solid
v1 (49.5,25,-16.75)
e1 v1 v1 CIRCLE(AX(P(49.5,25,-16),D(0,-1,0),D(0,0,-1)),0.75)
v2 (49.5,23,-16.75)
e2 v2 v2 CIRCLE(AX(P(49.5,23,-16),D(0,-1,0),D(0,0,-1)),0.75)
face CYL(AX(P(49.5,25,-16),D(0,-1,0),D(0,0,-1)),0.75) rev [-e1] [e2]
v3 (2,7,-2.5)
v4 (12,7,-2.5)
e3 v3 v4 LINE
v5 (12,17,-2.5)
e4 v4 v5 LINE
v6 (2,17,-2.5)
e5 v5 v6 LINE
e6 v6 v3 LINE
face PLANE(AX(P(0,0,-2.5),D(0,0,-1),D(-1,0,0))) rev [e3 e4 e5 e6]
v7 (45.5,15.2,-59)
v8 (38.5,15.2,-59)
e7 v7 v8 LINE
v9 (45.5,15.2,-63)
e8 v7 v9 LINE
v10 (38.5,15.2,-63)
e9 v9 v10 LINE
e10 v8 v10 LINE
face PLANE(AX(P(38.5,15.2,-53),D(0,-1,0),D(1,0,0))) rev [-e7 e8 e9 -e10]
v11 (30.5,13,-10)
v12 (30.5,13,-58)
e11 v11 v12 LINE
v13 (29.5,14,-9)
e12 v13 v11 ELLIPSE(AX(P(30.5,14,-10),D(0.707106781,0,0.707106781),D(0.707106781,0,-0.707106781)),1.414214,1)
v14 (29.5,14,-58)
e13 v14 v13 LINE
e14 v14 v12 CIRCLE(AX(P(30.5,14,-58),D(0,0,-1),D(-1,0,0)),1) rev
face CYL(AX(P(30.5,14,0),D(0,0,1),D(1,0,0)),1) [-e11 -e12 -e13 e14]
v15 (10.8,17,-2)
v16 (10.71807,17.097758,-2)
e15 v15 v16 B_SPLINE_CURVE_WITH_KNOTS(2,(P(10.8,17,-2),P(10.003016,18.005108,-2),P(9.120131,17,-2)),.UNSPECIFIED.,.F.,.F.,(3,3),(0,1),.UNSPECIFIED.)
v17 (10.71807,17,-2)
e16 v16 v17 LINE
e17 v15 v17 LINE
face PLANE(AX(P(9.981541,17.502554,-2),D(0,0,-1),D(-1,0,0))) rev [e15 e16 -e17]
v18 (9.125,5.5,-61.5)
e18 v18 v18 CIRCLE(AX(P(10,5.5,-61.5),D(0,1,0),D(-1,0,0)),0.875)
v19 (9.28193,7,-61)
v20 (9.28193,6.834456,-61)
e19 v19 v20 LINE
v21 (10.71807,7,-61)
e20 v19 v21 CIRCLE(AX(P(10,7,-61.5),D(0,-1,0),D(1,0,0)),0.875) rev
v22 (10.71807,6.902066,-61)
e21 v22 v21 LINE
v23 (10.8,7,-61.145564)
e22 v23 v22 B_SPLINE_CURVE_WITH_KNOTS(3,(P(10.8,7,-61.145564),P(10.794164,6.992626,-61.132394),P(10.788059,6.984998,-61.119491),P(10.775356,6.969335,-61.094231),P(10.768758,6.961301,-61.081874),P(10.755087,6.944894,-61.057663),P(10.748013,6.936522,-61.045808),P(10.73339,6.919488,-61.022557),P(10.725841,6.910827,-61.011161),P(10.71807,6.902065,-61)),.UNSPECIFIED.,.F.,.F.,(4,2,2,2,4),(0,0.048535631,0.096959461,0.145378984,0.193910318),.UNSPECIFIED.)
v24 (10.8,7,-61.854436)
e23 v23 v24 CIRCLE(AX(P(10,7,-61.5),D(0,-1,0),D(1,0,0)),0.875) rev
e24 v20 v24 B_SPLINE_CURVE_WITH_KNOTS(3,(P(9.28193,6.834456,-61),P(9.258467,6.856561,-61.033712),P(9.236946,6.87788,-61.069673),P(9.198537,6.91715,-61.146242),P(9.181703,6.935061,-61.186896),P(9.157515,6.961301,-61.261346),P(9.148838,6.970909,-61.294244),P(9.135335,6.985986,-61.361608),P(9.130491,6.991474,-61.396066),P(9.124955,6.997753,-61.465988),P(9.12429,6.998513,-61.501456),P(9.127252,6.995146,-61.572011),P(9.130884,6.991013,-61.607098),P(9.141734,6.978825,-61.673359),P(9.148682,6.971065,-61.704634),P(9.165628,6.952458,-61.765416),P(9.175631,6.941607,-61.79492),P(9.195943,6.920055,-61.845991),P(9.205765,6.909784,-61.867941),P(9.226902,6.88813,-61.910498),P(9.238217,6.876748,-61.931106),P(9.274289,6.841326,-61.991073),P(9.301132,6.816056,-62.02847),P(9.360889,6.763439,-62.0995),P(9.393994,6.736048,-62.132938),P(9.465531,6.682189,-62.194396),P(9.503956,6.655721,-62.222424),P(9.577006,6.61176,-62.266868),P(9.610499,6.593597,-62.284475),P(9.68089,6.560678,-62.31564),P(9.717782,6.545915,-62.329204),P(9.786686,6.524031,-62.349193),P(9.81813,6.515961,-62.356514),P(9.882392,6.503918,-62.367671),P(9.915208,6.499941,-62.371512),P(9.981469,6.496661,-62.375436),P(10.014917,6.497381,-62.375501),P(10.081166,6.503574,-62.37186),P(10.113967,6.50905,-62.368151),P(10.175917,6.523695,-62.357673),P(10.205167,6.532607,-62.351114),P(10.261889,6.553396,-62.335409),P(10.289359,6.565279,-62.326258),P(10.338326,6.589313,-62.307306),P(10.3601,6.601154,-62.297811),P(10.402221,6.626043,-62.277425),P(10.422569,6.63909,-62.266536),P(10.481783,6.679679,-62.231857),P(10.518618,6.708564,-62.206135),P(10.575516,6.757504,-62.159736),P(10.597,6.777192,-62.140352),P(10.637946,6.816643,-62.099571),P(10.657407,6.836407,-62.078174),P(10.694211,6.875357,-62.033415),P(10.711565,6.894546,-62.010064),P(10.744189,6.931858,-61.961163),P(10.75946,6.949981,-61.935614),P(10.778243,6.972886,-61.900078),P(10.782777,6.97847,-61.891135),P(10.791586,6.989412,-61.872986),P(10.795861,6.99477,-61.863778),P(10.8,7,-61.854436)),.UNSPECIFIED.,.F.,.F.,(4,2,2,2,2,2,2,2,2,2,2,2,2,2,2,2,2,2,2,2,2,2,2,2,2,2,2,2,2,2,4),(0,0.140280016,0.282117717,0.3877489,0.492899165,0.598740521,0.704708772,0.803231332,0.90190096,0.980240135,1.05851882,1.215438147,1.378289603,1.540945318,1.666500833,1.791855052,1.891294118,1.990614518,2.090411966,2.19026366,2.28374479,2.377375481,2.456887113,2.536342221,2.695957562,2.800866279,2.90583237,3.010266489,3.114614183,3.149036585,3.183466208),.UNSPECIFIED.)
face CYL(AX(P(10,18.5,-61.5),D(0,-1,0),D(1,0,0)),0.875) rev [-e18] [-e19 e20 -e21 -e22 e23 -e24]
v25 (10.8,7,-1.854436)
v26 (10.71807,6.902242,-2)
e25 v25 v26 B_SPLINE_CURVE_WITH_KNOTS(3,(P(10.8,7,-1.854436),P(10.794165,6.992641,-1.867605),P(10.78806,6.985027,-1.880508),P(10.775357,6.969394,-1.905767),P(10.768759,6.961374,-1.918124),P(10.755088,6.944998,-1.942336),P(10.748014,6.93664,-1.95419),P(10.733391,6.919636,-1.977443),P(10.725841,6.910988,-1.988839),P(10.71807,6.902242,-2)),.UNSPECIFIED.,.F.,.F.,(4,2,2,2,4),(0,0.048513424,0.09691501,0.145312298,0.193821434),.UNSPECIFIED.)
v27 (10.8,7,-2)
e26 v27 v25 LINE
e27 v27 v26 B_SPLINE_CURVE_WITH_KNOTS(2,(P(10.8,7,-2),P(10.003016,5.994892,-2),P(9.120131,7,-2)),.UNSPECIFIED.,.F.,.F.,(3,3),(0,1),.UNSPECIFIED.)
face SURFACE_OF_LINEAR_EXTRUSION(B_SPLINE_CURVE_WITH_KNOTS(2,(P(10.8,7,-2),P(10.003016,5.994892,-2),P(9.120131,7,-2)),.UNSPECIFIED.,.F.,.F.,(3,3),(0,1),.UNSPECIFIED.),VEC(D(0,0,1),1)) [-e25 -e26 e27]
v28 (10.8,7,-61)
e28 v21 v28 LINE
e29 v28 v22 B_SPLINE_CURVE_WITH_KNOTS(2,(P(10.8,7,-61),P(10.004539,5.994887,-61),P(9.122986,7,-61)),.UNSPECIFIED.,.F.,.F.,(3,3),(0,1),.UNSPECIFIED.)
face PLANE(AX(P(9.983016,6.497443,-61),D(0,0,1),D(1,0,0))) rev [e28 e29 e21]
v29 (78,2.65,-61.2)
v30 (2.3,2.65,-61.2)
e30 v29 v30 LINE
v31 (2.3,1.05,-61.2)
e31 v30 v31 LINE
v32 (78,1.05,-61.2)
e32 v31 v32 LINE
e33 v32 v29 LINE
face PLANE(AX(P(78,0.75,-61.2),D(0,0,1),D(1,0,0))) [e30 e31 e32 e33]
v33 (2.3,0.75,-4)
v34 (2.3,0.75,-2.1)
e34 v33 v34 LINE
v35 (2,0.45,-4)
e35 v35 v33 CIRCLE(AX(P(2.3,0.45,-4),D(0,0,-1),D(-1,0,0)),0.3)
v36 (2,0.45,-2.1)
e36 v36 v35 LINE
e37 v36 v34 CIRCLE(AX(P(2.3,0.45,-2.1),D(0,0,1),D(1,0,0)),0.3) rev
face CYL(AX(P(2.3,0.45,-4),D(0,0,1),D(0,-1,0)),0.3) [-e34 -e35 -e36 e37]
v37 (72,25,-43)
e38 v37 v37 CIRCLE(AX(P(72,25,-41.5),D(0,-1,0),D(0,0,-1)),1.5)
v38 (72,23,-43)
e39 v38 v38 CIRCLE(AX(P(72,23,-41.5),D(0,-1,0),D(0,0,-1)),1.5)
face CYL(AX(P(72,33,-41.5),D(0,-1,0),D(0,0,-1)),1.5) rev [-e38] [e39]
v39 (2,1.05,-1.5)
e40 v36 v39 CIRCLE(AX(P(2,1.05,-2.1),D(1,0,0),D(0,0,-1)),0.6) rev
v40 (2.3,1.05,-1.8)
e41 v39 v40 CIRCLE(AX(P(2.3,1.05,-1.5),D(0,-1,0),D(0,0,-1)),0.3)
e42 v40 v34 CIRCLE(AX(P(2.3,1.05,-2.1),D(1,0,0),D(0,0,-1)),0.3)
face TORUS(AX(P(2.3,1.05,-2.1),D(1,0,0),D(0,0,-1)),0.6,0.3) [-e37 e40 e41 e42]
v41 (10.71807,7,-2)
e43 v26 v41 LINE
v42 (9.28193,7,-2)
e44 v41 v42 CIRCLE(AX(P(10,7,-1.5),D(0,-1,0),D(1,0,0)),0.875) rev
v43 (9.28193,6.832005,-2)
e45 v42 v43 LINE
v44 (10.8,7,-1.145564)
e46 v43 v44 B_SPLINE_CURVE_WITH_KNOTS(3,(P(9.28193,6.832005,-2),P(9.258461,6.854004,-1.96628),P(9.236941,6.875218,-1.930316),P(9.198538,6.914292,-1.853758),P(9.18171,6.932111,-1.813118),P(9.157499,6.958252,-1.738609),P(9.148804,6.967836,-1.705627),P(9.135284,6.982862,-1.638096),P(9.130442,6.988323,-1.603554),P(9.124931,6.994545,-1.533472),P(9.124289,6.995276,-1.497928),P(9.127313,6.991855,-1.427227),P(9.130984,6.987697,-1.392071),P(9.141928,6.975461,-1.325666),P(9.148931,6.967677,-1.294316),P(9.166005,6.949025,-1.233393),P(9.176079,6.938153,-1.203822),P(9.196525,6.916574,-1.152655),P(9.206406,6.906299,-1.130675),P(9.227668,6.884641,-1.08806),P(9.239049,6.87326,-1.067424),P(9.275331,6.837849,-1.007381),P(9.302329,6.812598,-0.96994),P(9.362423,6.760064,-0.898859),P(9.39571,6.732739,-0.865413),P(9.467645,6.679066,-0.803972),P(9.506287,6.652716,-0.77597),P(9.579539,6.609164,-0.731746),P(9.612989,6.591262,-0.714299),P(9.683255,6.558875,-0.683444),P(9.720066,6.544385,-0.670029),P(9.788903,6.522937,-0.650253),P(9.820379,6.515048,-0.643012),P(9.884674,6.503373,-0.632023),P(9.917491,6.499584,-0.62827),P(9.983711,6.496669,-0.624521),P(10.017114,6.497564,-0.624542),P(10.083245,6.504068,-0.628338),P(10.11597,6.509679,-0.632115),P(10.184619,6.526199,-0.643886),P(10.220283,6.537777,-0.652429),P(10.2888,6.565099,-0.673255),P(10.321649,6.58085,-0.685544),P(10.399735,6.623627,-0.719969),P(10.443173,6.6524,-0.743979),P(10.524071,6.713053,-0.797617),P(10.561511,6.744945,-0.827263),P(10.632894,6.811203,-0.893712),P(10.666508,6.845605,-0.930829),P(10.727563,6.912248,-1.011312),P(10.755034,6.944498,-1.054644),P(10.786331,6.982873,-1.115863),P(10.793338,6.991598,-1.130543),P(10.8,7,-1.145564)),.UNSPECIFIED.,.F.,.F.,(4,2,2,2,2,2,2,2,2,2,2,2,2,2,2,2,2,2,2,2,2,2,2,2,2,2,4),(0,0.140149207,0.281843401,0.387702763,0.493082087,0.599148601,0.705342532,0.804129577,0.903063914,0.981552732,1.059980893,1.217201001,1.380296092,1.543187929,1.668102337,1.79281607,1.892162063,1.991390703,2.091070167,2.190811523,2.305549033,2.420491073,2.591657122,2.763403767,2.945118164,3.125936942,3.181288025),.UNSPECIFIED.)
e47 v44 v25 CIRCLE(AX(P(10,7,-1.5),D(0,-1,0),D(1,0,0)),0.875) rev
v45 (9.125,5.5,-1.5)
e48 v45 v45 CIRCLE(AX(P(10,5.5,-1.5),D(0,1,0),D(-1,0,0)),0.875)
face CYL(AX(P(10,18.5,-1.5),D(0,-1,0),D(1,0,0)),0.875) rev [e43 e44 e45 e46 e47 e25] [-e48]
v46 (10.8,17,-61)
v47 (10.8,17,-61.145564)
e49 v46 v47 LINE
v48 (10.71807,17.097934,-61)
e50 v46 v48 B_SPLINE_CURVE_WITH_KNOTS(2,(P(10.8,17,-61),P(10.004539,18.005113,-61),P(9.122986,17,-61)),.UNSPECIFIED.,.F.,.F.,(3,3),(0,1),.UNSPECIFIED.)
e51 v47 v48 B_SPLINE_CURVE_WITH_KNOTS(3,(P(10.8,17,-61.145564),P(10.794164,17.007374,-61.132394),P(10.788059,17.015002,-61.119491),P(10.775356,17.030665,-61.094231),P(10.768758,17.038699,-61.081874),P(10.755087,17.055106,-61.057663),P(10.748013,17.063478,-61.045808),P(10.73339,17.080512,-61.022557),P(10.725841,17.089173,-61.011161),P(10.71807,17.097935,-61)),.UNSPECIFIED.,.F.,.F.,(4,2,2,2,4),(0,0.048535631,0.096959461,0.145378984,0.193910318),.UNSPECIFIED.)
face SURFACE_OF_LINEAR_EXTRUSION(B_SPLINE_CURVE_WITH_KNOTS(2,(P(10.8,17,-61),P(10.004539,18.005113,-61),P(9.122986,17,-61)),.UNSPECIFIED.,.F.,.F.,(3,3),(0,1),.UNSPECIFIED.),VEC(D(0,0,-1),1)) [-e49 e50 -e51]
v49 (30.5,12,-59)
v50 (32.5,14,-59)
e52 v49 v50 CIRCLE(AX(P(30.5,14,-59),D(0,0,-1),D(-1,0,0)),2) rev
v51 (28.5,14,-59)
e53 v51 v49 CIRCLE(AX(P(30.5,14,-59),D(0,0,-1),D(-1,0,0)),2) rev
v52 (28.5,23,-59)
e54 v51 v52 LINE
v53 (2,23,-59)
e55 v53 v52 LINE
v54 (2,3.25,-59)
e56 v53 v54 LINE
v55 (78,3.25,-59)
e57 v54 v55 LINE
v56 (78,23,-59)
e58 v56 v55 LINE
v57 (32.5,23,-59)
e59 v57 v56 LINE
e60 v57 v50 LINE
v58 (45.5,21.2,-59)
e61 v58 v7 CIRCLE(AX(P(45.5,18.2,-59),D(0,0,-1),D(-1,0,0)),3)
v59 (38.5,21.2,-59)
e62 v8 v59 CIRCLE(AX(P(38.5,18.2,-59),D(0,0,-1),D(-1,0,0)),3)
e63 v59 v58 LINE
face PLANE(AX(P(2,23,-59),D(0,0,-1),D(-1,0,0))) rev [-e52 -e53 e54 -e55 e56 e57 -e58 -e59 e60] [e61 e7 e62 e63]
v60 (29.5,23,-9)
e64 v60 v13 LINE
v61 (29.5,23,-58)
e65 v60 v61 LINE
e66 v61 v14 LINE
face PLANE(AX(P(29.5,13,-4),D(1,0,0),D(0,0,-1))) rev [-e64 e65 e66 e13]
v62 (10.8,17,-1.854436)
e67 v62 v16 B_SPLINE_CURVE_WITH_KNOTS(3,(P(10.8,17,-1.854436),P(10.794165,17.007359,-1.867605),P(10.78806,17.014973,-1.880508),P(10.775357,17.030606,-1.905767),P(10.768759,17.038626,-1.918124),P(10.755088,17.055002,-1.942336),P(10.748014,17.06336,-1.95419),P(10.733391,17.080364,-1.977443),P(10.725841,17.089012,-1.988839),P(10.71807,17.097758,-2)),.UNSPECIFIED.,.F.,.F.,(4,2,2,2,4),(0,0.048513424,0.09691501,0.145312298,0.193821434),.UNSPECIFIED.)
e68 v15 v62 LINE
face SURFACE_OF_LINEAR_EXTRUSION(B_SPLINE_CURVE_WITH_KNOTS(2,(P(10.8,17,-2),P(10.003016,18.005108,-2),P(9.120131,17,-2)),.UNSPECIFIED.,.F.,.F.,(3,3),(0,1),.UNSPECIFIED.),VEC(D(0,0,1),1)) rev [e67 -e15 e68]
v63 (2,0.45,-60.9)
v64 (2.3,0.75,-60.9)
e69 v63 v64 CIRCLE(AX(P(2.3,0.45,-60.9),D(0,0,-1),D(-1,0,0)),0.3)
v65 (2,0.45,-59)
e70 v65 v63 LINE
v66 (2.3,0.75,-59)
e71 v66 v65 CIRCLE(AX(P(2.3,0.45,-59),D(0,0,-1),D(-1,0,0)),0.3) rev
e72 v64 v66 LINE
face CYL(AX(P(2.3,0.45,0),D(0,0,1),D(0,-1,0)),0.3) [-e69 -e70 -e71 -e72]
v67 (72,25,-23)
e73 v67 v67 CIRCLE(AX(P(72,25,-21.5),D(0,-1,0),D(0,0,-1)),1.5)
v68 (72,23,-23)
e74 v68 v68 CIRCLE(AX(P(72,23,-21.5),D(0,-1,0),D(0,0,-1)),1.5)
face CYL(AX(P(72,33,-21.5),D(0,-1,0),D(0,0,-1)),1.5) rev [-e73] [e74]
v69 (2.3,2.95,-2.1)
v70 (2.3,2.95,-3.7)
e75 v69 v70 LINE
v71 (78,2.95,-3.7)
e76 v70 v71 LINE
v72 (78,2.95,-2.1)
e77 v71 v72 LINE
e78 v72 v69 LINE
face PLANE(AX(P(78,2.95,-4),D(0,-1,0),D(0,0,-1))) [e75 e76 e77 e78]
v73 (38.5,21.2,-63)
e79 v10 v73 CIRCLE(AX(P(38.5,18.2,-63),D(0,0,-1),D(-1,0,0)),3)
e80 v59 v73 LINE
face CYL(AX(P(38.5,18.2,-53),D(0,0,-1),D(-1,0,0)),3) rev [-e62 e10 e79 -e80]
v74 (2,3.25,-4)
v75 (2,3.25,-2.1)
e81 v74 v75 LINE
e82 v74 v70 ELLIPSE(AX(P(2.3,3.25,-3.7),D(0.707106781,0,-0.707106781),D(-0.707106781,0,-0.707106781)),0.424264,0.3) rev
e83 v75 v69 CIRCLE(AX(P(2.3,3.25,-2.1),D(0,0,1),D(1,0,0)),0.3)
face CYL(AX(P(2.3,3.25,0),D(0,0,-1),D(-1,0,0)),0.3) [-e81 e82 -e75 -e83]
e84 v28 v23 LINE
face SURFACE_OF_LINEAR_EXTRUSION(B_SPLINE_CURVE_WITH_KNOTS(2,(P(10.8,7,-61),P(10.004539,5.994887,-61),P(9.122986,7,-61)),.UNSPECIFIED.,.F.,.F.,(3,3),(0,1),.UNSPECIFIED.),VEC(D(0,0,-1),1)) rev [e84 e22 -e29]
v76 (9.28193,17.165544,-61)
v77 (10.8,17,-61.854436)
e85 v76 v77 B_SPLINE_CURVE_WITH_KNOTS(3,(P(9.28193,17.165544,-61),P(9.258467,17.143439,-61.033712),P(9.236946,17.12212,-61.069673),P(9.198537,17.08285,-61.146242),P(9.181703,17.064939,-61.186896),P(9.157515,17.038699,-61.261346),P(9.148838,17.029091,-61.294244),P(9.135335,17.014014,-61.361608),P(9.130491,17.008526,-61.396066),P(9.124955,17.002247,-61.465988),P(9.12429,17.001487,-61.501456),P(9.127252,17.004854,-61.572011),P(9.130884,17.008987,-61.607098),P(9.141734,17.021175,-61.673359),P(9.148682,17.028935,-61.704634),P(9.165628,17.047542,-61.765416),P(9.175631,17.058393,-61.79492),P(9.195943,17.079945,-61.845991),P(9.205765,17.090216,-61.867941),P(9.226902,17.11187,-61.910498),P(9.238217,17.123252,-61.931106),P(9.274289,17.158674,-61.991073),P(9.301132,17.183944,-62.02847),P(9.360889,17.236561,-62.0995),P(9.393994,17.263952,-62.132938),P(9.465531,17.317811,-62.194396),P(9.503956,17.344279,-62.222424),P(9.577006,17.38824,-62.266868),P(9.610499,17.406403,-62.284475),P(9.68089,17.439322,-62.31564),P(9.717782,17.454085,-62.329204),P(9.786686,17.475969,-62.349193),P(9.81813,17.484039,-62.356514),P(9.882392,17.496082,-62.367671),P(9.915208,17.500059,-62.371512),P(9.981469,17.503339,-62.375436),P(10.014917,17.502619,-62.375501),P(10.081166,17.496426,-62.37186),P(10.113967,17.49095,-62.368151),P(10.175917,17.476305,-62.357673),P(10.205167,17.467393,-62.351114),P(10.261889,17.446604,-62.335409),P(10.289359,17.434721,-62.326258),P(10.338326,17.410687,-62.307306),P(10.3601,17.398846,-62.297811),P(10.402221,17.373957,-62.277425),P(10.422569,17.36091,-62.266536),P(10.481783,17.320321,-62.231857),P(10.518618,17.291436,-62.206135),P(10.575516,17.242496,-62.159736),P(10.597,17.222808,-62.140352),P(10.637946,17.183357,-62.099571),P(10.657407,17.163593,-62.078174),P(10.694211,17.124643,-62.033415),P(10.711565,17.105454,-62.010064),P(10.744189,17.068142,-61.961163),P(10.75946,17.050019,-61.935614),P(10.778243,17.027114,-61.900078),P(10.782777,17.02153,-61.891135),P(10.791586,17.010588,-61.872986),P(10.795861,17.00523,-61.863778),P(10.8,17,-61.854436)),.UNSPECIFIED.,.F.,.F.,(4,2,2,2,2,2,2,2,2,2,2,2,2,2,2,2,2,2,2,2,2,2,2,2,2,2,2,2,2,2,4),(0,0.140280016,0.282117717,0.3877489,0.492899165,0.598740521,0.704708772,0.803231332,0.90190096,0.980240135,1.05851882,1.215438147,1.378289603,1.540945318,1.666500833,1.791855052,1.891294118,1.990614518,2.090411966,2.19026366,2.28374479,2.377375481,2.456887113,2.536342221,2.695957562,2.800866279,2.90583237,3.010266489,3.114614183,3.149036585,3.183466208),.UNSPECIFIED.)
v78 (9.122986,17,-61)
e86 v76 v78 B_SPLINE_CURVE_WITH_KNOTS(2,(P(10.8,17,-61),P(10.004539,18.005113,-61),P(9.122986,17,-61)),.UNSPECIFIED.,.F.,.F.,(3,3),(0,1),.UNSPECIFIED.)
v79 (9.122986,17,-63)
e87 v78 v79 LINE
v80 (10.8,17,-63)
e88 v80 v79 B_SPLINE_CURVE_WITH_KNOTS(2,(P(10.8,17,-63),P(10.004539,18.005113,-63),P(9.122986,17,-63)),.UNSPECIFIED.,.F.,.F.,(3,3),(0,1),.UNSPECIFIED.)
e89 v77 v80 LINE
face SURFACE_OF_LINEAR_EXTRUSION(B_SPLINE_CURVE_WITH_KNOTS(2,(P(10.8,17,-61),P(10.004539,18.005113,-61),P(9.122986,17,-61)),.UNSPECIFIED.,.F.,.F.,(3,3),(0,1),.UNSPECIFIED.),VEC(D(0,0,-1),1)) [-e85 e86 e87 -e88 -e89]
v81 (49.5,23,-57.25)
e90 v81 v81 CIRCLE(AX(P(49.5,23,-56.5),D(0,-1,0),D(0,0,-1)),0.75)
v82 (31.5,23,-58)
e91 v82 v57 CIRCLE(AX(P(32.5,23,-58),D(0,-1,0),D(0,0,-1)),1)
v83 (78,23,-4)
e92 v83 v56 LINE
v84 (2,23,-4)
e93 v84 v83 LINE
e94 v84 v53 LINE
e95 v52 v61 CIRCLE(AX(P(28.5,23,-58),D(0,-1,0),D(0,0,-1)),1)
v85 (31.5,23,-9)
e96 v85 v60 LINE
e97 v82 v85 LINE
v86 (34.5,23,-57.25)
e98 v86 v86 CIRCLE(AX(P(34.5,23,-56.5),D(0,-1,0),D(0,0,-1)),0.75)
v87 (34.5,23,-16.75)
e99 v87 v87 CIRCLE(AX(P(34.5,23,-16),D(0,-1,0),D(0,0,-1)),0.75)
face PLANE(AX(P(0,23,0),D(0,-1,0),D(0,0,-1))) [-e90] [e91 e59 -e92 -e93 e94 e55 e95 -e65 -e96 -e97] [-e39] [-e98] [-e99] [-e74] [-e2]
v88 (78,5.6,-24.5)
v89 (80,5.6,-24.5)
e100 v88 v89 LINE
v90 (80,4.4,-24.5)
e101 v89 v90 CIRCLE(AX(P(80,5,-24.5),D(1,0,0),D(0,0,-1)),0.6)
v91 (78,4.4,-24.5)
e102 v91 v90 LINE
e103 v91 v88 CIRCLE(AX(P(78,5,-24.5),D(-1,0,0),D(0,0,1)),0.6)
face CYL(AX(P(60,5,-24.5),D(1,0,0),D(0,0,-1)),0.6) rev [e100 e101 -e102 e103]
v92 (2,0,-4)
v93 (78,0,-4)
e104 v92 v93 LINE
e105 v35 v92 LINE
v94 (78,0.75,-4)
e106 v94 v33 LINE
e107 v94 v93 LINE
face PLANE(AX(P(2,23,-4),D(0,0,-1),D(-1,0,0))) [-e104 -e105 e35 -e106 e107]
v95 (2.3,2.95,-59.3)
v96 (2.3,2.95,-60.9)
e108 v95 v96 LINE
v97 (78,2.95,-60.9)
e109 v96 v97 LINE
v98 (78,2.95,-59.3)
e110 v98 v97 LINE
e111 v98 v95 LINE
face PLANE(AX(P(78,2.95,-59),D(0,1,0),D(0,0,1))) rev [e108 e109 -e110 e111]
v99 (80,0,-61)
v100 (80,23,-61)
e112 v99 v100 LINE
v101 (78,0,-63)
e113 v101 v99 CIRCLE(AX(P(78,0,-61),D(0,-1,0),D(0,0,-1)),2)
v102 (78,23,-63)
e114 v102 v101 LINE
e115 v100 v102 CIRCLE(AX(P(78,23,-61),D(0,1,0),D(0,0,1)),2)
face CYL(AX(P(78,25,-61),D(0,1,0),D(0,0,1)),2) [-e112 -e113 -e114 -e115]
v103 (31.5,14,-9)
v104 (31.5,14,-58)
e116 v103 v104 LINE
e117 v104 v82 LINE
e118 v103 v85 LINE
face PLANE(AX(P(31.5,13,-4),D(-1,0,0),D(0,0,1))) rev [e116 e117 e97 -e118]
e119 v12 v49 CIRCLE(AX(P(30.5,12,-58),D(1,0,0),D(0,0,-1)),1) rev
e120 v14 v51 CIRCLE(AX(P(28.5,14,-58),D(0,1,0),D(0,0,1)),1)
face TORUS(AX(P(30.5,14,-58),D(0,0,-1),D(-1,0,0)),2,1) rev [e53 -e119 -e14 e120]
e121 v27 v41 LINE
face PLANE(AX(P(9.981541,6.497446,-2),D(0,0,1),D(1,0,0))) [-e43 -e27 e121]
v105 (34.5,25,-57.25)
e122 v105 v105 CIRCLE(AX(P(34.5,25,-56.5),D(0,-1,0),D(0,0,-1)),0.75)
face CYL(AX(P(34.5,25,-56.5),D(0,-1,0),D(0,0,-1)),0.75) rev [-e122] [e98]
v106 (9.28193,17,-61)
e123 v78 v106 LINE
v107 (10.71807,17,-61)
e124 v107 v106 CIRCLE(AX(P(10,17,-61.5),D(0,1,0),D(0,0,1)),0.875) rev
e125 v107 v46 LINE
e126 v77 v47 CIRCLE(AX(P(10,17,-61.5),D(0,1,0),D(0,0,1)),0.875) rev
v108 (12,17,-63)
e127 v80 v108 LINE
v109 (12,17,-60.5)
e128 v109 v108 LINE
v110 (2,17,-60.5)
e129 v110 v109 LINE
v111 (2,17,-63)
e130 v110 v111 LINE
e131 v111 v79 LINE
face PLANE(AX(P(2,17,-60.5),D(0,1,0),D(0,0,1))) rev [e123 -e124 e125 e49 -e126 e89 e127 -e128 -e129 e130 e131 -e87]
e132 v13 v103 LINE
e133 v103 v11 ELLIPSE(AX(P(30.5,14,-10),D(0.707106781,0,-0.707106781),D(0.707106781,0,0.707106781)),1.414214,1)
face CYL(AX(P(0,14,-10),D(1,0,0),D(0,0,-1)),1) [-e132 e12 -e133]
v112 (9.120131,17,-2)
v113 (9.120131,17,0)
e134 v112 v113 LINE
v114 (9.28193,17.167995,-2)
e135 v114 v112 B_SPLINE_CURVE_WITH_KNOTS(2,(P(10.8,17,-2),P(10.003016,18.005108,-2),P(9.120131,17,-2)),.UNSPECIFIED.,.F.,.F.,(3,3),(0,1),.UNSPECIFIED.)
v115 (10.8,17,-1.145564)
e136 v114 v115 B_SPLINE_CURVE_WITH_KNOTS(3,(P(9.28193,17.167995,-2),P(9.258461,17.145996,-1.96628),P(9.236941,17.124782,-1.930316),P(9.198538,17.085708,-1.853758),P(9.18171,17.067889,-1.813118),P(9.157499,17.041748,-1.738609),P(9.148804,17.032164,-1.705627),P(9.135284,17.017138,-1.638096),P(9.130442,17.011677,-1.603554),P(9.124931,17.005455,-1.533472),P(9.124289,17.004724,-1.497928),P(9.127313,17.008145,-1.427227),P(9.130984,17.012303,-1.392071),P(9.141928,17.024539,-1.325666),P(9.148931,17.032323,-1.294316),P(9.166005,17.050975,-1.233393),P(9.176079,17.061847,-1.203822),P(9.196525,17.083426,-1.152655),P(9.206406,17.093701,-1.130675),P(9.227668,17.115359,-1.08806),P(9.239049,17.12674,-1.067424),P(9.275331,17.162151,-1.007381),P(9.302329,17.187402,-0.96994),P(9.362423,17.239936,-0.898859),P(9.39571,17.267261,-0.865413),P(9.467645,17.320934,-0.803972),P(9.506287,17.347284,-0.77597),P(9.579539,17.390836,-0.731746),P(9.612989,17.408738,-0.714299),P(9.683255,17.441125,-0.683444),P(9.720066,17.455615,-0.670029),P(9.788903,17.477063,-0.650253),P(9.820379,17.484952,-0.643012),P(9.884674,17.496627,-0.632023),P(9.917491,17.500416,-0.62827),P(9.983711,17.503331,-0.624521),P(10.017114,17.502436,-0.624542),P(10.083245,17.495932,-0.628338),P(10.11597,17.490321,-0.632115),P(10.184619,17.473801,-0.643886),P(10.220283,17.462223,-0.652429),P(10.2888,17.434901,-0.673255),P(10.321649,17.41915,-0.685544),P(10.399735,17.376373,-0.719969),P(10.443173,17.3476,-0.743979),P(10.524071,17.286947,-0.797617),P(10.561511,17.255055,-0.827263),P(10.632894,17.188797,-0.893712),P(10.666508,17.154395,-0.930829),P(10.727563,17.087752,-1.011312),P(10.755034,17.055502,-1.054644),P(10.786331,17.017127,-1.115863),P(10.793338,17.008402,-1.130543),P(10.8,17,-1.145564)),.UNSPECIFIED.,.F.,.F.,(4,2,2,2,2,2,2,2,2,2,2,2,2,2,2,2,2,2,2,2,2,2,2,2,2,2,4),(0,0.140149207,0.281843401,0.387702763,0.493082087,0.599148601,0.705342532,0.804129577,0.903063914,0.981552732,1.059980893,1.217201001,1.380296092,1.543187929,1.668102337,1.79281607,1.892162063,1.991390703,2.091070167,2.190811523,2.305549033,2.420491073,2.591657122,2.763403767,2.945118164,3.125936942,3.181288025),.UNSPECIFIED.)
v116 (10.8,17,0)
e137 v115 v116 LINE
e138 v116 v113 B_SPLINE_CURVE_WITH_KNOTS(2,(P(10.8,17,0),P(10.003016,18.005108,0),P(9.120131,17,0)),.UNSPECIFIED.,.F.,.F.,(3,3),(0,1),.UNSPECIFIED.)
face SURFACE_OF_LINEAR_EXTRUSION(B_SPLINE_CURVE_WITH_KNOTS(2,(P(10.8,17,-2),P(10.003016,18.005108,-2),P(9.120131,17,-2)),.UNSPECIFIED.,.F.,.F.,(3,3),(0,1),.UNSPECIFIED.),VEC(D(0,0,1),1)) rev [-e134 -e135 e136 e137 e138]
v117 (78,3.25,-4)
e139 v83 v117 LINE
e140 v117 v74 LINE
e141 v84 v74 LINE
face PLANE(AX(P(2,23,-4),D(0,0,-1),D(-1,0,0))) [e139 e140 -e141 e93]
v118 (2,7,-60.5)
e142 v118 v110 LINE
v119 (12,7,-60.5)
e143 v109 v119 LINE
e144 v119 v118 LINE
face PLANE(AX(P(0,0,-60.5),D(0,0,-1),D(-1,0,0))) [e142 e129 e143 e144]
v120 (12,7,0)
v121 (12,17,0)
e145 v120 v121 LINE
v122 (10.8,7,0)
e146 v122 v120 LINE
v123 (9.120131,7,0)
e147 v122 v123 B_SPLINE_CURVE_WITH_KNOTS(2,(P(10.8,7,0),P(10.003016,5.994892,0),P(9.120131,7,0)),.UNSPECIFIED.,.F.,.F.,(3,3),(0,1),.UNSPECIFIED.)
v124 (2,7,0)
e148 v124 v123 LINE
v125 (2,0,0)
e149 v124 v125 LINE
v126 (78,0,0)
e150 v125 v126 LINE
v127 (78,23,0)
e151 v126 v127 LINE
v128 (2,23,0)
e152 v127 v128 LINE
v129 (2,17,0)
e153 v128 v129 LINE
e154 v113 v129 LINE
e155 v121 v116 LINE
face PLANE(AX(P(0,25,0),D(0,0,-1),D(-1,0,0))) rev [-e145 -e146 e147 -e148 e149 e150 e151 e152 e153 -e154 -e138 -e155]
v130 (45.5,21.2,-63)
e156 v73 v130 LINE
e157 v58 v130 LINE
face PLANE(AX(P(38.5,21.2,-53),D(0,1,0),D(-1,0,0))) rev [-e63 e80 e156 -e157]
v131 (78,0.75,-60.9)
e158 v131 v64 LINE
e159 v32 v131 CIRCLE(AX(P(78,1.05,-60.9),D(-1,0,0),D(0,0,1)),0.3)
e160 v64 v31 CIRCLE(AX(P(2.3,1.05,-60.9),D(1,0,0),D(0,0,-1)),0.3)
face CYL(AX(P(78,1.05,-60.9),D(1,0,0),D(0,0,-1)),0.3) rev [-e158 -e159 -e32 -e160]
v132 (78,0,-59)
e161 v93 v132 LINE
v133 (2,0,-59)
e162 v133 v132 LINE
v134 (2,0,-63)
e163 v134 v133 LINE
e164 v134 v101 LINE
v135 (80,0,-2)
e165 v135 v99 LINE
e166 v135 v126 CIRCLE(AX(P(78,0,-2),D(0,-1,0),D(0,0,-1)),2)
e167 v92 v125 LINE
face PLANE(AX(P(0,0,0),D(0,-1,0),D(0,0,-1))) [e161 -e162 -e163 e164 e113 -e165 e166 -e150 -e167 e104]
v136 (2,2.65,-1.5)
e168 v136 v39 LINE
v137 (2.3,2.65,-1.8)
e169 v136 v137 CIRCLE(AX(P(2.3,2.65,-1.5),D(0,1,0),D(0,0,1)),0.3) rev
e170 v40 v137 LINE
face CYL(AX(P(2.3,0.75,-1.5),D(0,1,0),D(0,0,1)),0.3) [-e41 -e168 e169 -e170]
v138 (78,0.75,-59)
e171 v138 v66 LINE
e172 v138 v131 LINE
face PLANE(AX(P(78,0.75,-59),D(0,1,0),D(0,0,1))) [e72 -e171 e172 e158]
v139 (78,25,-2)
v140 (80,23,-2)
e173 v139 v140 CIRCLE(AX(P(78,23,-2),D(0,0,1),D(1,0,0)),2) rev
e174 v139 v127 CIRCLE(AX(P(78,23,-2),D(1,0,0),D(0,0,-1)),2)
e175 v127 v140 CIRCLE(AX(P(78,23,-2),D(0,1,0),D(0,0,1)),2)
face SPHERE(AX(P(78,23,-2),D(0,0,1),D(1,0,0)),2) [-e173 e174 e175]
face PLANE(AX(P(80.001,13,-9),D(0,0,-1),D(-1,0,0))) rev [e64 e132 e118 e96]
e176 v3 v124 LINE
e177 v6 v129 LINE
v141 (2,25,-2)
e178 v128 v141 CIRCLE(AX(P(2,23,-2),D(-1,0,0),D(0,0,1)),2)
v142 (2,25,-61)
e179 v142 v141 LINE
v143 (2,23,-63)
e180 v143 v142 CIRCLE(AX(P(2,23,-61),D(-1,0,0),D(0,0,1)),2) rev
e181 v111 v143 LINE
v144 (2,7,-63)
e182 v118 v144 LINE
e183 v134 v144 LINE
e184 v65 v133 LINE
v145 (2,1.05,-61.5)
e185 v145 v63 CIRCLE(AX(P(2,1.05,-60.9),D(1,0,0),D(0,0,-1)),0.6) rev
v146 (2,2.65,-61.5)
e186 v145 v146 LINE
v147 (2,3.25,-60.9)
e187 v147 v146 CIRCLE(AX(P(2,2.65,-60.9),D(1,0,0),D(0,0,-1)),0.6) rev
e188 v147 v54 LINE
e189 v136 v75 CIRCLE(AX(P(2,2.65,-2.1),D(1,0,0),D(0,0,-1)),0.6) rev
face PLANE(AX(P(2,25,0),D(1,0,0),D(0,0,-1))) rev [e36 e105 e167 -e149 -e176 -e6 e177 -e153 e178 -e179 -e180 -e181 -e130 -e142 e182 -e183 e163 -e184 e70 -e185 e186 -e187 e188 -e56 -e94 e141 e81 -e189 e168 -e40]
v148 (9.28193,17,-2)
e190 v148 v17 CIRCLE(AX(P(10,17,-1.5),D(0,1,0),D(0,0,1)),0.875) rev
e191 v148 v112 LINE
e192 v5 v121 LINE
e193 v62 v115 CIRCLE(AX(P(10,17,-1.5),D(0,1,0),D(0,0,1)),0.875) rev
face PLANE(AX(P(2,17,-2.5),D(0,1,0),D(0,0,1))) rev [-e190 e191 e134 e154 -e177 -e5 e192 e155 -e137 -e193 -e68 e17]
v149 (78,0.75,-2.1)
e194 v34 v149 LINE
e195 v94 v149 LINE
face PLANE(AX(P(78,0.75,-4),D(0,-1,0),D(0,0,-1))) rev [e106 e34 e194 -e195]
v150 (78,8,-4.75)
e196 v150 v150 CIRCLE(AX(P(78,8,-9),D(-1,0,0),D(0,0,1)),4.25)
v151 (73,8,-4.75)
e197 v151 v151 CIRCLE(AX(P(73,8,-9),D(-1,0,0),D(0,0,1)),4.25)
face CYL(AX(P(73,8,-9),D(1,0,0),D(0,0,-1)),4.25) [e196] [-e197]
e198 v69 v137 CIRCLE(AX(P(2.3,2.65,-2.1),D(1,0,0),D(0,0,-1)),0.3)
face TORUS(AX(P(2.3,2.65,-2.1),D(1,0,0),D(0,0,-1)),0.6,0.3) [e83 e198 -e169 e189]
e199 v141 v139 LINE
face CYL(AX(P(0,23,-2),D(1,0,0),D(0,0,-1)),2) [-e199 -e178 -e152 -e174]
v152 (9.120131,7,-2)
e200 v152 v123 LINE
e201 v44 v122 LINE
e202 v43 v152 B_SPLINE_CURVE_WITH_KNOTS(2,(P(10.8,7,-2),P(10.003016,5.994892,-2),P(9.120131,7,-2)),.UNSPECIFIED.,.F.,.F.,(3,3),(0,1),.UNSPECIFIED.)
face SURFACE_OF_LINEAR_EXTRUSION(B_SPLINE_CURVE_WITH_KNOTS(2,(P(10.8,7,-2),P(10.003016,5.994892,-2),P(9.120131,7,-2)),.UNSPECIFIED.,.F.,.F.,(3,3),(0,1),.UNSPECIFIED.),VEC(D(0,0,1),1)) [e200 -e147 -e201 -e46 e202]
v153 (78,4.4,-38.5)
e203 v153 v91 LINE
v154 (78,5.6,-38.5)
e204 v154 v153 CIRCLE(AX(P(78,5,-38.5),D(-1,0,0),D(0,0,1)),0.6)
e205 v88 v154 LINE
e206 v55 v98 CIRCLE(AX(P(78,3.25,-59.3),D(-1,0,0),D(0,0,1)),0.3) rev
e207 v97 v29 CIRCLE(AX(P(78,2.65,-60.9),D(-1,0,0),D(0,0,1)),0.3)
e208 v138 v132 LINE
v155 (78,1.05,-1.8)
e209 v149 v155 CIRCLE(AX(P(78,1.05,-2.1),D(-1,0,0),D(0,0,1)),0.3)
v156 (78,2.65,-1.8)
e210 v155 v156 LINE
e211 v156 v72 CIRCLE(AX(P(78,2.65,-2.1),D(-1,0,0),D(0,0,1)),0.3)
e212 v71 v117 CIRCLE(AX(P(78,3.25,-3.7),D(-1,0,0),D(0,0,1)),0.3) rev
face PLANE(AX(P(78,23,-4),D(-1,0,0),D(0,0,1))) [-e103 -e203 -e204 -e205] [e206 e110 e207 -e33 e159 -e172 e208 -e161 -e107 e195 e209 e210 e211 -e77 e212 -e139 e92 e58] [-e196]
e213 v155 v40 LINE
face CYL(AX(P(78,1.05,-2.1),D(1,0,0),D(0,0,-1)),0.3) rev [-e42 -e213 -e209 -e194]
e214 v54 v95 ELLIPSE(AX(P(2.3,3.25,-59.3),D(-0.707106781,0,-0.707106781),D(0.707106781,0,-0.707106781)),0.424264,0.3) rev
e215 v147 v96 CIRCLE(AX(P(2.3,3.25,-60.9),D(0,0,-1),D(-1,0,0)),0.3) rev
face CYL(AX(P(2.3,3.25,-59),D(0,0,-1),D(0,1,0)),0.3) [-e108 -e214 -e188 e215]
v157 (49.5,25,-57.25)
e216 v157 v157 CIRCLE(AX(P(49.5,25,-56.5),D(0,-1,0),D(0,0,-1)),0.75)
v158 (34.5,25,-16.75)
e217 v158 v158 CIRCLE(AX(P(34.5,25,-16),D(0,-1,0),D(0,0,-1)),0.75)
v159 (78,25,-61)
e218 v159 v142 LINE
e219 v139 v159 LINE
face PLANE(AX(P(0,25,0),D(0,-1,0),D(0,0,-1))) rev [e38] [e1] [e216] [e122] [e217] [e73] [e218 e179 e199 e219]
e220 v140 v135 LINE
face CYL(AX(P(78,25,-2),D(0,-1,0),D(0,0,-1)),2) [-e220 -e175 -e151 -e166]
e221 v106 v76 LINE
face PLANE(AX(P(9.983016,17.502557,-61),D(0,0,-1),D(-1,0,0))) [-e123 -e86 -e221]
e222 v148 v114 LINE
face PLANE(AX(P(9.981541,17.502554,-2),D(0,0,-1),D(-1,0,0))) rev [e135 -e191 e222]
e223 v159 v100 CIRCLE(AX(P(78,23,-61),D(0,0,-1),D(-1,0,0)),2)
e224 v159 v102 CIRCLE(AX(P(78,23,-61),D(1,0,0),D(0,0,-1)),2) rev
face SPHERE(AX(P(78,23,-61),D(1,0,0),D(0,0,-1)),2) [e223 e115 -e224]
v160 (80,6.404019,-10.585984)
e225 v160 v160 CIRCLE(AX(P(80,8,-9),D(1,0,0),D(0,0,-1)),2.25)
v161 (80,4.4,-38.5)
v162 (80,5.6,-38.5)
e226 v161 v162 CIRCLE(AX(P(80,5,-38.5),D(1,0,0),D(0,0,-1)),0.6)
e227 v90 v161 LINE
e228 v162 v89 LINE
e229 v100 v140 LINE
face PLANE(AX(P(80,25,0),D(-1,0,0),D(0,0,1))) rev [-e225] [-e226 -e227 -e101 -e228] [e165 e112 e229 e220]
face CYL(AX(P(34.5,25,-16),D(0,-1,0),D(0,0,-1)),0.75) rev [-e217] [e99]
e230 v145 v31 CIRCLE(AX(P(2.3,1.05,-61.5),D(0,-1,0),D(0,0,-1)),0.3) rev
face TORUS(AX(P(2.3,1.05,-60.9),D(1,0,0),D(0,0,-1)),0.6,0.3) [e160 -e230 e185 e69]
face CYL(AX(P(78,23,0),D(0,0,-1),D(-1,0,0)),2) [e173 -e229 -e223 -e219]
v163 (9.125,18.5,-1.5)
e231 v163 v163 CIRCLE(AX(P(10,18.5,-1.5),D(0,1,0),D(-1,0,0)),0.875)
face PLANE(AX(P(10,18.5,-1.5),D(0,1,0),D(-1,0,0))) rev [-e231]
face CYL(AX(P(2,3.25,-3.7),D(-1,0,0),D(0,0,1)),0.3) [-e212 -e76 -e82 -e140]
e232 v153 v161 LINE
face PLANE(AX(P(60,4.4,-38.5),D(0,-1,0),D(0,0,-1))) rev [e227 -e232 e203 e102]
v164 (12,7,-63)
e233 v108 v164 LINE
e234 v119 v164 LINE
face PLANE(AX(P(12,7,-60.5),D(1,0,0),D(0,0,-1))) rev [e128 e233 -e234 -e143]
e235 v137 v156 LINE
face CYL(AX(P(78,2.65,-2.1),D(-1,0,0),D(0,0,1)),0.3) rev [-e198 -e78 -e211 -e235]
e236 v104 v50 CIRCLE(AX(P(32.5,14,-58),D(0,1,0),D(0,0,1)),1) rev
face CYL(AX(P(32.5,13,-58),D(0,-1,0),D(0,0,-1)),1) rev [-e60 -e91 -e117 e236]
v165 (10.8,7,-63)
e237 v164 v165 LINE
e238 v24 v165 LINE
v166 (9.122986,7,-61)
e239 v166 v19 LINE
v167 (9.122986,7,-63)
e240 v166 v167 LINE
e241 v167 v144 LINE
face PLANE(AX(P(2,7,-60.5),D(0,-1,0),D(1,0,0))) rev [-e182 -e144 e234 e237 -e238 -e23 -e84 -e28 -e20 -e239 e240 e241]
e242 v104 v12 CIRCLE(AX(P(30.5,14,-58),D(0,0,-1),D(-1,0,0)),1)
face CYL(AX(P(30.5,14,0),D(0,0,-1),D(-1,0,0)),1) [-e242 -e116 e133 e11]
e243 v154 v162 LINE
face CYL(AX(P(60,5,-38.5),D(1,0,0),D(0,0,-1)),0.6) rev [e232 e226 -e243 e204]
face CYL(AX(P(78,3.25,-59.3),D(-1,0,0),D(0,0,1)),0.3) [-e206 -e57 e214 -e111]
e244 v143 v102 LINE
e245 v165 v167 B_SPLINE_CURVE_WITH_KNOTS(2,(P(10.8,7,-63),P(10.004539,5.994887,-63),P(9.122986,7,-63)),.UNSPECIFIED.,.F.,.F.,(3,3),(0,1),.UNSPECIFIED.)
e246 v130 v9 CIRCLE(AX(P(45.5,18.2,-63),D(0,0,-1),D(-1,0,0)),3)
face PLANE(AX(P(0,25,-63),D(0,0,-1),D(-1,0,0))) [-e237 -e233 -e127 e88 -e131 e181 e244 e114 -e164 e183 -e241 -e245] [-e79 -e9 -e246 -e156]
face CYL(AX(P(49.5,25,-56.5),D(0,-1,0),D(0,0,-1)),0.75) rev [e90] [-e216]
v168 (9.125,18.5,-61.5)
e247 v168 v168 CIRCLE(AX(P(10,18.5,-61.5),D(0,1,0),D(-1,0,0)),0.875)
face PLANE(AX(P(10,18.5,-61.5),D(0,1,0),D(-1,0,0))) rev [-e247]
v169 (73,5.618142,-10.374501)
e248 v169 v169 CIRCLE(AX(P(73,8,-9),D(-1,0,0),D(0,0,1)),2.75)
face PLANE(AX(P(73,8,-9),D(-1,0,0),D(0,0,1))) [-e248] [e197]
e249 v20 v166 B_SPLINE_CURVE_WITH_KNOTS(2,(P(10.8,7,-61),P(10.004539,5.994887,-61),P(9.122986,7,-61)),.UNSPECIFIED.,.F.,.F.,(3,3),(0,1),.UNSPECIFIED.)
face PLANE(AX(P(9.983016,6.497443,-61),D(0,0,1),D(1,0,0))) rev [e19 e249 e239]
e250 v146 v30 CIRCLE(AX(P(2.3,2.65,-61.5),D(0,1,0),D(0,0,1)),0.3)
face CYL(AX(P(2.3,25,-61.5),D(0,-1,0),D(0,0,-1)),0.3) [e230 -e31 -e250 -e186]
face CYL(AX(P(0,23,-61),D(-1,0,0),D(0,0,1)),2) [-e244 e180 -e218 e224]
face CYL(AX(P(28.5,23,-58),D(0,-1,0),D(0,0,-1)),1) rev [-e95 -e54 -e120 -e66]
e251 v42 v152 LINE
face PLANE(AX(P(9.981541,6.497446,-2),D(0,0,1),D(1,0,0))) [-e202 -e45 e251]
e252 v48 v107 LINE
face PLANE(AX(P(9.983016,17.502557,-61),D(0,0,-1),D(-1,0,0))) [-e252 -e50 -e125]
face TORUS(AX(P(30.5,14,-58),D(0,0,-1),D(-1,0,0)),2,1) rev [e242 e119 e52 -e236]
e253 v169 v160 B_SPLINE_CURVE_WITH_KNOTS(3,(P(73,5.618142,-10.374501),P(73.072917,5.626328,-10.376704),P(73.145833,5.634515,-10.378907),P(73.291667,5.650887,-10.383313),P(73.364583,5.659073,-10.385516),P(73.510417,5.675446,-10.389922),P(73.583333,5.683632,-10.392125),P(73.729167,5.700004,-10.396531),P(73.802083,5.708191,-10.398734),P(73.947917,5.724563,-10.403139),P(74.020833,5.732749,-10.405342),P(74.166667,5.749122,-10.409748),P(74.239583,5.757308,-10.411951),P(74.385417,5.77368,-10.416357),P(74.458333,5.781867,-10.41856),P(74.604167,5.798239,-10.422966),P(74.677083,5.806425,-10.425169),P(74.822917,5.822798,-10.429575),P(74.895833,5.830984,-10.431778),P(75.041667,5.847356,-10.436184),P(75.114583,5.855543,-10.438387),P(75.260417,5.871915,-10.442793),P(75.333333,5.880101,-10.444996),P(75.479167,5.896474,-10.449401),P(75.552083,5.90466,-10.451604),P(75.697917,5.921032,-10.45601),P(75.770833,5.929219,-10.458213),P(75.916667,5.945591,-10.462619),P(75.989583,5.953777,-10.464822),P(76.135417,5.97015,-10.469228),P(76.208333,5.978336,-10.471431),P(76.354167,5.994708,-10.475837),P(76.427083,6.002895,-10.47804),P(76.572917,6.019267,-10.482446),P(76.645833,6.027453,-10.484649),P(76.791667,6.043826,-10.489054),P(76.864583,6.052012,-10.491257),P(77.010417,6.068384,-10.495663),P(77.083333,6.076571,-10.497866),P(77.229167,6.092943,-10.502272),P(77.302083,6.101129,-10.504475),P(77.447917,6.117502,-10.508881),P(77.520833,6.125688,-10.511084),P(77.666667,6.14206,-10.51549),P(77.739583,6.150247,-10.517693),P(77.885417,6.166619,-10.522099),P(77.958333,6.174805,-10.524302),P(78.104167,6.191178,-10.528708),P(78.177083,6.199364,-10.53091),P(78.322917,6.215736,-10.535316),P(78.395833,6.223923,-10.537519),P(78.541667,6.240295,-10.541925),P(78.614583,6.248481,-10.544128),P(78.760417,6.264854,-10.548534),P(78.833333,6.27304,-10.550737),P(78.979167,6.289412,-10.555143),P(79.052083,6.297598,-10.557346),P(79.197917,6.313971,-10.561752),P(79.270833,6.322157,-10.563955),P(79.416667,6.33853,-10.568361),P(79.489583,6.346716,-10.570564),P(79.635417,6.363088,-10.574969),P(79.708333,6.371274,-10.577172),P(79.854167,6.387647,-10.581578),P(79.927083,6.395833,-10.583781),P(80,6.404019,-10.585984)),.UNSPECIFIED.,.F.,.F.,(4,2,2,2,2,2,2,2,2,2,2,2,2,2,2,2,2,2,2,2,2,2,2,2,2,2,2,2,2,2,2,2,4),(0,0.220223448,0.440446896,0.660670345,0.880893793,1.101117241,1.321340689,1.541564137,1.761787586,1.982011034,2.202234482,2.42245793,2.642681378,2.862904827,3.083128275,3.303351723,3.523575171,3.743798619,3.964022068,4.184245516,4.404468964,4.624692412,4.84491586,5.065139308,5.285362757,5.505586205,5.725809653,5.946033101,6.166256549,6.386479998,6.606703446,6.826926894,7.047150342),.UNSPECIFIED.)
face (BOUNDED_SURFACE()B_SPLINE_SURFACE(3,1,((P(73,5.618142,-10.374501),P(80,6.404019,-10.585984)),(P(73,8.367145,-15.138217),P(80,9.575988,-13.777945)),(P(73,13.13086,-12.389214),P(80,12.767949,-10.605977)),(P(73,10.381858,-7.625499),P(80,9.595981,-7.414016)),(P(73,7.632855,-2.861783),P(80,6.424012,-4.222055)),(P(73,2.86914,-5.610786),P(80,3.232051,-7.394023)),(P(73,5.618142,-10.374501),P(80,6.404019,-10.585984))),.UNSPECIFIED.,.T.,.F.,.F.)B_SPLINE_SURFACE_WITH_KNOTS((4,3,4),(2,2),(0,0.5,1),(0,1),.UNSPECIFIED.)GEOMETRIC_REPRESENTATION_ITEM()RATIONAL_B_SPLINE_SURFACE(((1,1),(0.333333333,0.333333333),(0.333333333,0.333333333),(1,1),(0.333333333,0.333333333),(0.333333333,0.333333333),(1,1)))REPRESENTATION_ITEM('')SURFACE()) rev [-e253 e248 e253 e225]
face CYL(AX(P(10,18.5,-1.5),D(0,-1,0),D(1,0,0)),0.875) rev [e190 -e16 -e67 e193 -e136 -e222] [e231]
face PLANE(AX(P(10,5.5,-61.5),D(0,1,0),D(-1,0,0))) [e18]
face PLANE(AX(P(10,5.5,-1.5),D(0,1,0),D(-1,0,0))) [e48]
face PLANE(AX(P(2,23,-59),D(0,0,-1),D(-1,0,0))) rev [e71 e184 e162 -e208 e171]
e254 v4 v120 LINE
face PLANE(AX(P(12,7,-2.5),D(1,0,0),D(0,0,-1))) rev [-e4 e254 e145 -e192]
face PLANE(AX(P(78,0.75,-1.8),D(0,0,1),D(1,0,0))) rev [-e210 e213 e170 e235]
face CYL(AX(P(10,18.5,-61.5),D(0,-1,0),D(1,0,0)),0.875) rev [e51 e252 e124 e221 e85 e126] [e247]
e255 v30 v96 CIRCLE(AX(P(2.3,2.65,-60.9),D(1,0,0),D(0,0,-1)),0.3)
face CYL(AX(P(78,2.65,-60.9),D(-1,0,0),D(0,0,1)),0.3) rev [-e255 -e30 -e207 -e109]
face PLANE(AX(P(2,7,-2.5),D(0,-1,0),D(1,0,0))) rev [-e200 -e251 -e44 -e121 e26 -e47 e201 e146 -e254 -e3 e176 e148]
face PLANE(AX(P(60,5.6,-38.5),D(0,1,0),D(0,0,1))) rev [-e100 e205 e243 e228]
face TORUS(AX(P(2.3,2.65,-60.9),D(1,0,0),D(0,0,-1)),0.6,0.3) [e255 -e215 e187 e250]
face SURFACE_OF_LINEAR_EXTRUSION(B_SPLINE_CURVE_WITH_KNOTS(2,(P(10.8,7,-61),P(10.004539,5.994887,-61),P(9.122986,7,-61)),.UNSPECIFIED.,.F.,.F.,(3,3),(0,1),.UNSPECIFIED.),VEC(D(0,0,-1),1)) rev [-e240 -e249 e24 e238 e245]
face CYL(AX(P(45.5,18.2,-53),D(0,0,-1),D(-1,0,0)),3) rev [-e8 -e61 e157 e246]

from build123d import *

# Parameters (mm, degrees)
SKETCH1_W               = 80
SKETCH1_H               = 63
BOSS_EXTRUDE2_DEPTH     = 25
SKETCH1_4_W             = 76
SKETCH1_4_H             = 55
CUT_EXTRUDE1_DEPTH      = 23
CUT_EXTRUDE2_DEPTH      = 20
SKETCH4_W               = 2
SKETCH4_H               = 55
BOSS_EXTRUDE3_DEPTH     = 10
FILLET1_R               = 2
SKETCH5_W               = 2
SKETCH5_H               = 63
CUT_EXTRUDE3_DEPTH      = 105.852277038
SKETCH6_W               = 2.2
SKETCH6_H               = 2.2
CUT_EXTRUDE4_DEPTH      = 76
SKETCH7_W               = 10
SKETCH7_H               = 10
CUT_EXTRUDE5_DEPTH      = 2.5
CUT_EXTRUDE6_DEPTH      = 11.5
CUT_EXTRUDE6_DEPTH_BACK = 1.5
SKETCH8_R               = 0.875
SKETCH9_W               = 10
SKETCH9_H               = 10
CUT_EXTRUDE7_DEPTH      = 2.5
CUT_EXTRUDE8_DEPTH      = 11.5
CUT_EXTRUDE8_DEPTH_BACK = 1.5
SKETCH10_R              = 0.875
CUT_EXTRUDE9_DEPTH      = 2
CUT_EXTRUDE10_DEPTH     = 2
SKETCH13_R              = 0.75
CUT_EXTRUDE11_DEPTH     = 105.393486469
FILLET2_R               = 0.3
CUT_EXTRUDE13_REACH     = 86.524
SKETCH15_W              = 5
SKETCH15_H              = 10
FILLET3_R               = 1
SKETCH16_R              = 4.25
BOSS_EXTRUDE4_DEPTH     = 5
CUT_EXTRUDE14_DEPTH     = 10
SKETCH21_R              = 1.5
CUT_EXTRUDE15_DEPTH     = 10


with BuildPart() as part:
    # Sketch1 → Boss-Extrude2 (new body)
    with BuildSketch(Plane(origin=(0, 0, 0), x_dir=(1, 0, 0), z_dir=(0, 1, 0))):
        with Locations((40, 31.5)):
            Rectangle(SKETCH1_W, SKETCH1_H)
    extrude(amount=BOSS_EXTRUDE2_DEPTH)

    # Sketch1<4> → Cut-Extrude1 (cut)
    with BuildSketch(Plane(origin=(0, 0, 0), x_dir=(1, 0, 0), z_dir=(0, 1, 0))):
        with Locations((40, 31.5)):
            Rectangle(SKETCH1_4_W, SKETCH1_4_H)
    extrude(amount=CUT_EXTRUDE1_DEPTH, mode=Mode.SUBTRACT)

    # Sketch3 → Cut-Extrude2 (cut)
    with BuildSketch(Plane(origin=(80, 0, 0), x_dir=(0, 0, -1), z_dir=(1, 0, 0))):
        with BuildLine():
            Line((38.5, 4.4), (24.5, 4.4))
            ThreePointArc((24.5, 4.4), (23.9, 5), (24.5, 5.6))
            Line((24.5, 5.6), (38.5, 5.6))
            ThreePointArc((38.5, 5.6), (39.1, 5), (38.5, 4.4))
        make_face()
    extrude(amount=-CUT_EXTRUDE2_DEPTH, mode=Mode.SUBTRACT)

    # Sketch4 → Boss-Extrude3 (add)
    with BuildSketch(Plane.XZ.offset(-23)):
        with Locations((30.5, -31.5)):
            Rectangle(SKETCH4_W, SKETCH4_H)
    extrude(amount=BOSS_EXTRUDE3_DEPTH)

    # Fillet1
    fillet1_edges = [part.edges().sort_by_distance(p)[0] for p in [
        (80, 25, -31.5),
        (40, 25, 0),
        (0, 25, -31.5),
        (0, 12.5, 0),
        (80, 12.5, 0),
        (80, 12.5, -63),
        (0, 12.5, -63),
        (40, 25, -63),
    ]]
    fillet(fillet1_edges, radius=FILLET1_R)

    # Sketch5 → Cut-Extrude3 (cut, through all)
    with BuildSketch(Plane(origin=(0, 0, 0), x_dir=(-1, 0, 0), z_dir=(0, -1, 0))):
        with Locations((-1, 31.5)):
            Rectangle(SKETCH5_W, SKETCH5_H)
    extrude(amount=-CUT_EXTRUDE3_DEPTH, mode=Mode.SUBTRACT)

    # Sketch6 → Cut-Extrude4 (cut)
    with BuildSketch(Plane.ZY.offset(-2)):
        with Locations((-2.9, 1.85)):
            Rectangle(SKETCH6_W, SKETCH6_H)
        with Locations((-60.1, 1.85)):
            Rectangle(SKETCH6_W, SKETCH6_H)
    extrude(amount=-CUT_EXTRUDE4_DEPTH, mode=Mode.SUBTRACT)

    # Sketch7 → Cut-Extrude5 (cut)
    with BuildSketch(Plane(origin=(0, 0, -63), x_dir=(-1, 0, 0), z_dir=(0, 0, -1))):
        with Locations((-7, 12)):
            Rectangle(SKETCH7_W, SKETCH7_H)
    extrude(amount=-CUT_EXTRUDE5_DEPTH, mode=Mode.SUBTRACT)

    # Sketch8 → Cut-Extrude6 (cut, two sides: drawn at the far end of the back side and taken through both)
    with BuildSketch(Plane(origin=(0, 7, 0), x_dir=(1, 0, 0), z_dir=(0, 1, 0)).offset(-CUT_EXTRUDE6_DEPTH_BACK)):
        with Locations(Location((10, 61.5, 0), (0, 0, 270))):
            Circle(SKETCH8_R)
    extrude(amount=CUT_EXTRUDE6_DEPTH + CUT_EXTRUDE6_DEPTH_BACK, mode=Mode.SUBTRACT)

    # Sketch9 → Cut-Extrude7 (cut)
    with BuildSketch(Plane.XY):
        with Locations((7, 12)):
            Rectangle(SKETCH9_W, SKETCH9_H)
    extrude(amount=-CUT_EXTRUDE7_DEPTH, mode=Mode.SUBTRACT)

    # Sketch10 → Cut-Extrude8 (cut, two sides: drawn at the far end of the back side and taken through both)
    with BuildSketch(Plane(origin=(0, 7, 0), x_dir=(1, 0, 0), z_dir=(0, 1, 0)).offset(-CUT_EXTRUDE8_DEPTH_BACK)):
        with Locations((10, 1.5)):
            Circle(SKETCH10_R)
    extrude(amount=CUT_EXTRUDE8_DEPTH + CUT_EXTRUDE8_DEPTH_BACK, mode=Mode.SUBTRACT)

    # Sketch11 → Cut-Extrude9 (cut)
    with BuildSketch(Plane(origin=(0, 0, -63), x_dir=(-1, 0, 0), z_dir=(0, 0, -1))):
        with BuildLine():
            Line((-9.122986176, 7), (-10.8, 7))
            add(Edge.make_bspline(
                [(-10.8, 7), (-10.004539285, 5.994886644), (-9.122986176, 7)],
                knots=[0, 0, 0, 1, 1, 1], degree=2))
        make_face()
        with BuildLine():
            Line((-9.122986176, 17), (-10.8, 17))
            add(Edge.make_bspline(
                [(-10.8, 17), (-10.004539285, 18.005113356), (-9.122986176, 17)],
                knots=[0, 0, 0, 1, 1, 1], degree=2))
        make_face()
    extrude(amount=-CUT_EXTRUDE9_DEPTH, mode=Mode.SUBTRACT)

    # Sketch12 → Cut-Extrude10 (cut)
    with BuildSketch(Plane.XY):
        with BuildLine():
            Line((10.8, 7), (9.120131213, 7))
            add(Edge.make_bspline(
                [(10.8, 7), (10.003016043, 5.994891859), (9.120131213, 7)],
                knots=[0, 0, 0, 1, 1, 1], degree=2))
        make_face()
        with BuildLine():
            Line((10.8, 17), (9.120131213, 17))
            add(Edge.make_bspline(
                [(10.8, 17), (10.003016043, 18.005108141), (9.120131213, 17)],
                knots=[0, 0, 0, 1, 1, 1], degree=2))
        make_face()
    extrude(amount=-CUT_EXTRUDE10_DEPTH, mode=Mode.SUBTRACT)

    # Sketch13 → Cut-Extrude11 (cut, through all)
    with BuildSketch(Plane(origin=(0, 23, 0), x_dir=(-1, 0, 0), z_dir=(0, -1, 0))):
        with Locations(Location((-34.5, 56.5, 0), (0, 0, 90))):
            Circle(SKETCH13_R)
        with Locations(Location((-49.5, 56.5, 0), (0, 0, 90))):
            Circle(SKETCH13_R)
        with Locations(Location((-34.5, 16, 0), (0, 0, 90))):
            Circle(SKETCH13_R)
        with Locations(Location((-49.5, 16, 0), (0, 0, 90))):
            Circle(SKETCH13_R)
    extrude(amount=-CUT_EXTRUDE11_DEPTH, mode=Mode.SUBTRACT)

    # Fillet2
    fillet2_edges = [part.edges().sort_by_distance(p)[0] for p in [
        (40, 2.95, -59),
        (2, 0.75, -60.1),
        (2, 1.85, -61.2),
        (40, 0.75, -61.2),
        (40, 2.95, -61.2),
        (2, 2.95, -60.1),
        (2, 2.95, -2.9),
        (40, 2.95, -4),
        (40, 2.95, -1.8),
        (40, 0.75, -1.8),
        (2, 0.75, -2.9),
        (2, 1.85, -1.8),
    ]]
    fillet(fillet2_edges, radius=FILLET2_R)

    # Sketch15 → Cut-Extrude13 (cut, up to next)
    with BuildSketch(Plane.ZY.offset(-29.5), mode=Mode.PRIVATE) as cut_extrude13_sk1:
        with Locations((-6.5, 18)):
            Rectangle(SKETCH15_W, SKETCH15_H)
    cut_extrude13_tool1 = extrude(cut_extrude13_sk1.sketch, amount=-CUT_EXTRUDE13_REACH, mode=Mode.PRIVATE) & part.part
    add(cut_extrude13_tool1.solids().sort_by_distance((29.5, 18, -6.5))[0], mode=Mode.SUBTRACT)

    # Fillet3
    fillet3_edges = [part.edges().sort_by_distance(p)[0] for p in [
        (29.5, 13, -34),
        (30.5, 13, -9),
        (29.5, 18, -59),
        (31.5, 18, -59),
        (30.5, 13, -59),
        (31.5, 13, -34),
    ]]
    fillet(fillet3_edges, radius=FILLET3_R - 0.0001)  # a hair under: the kernel refuses the full size

    # Sketch16 → Boss-Extrude4 (add)
    with BuildSketch(Plane.ZY.offset(-78)):
        with Locations((-9, 8)):
            Circle(SKETCH16_R)
    extrude(amount=BOSS_EXTRUDE4_DEPTH)

    # Cut-Loft1: read off the stored shape, not the designer's step
    # Cut-Loft1: loft between two sections, ruled curve by curve
    cut_loft1_from = [
        Edge.make_bspline([(73, 5.618142213, -10.374501175), (73, 8.367144563, -15.13821675), (73, 13.130860138, -12.3892144), (73, 10.381857787, -7.625498825), (73, 7.632855437, -2.86178325), (73, 2.869139862, -5.6107856), (73, 5.618142213, -10.374501175)], [0, 0, 0, 0, 0.5, 0.5, 0.5, 1, 1, 1, 1], 3, [1, 0.333333333, 0.333333333, 1, 0.333333333, 0.333333333, 1]),
    ]
    cut_loft1_to = [
        Edge.make_bspline([(80, 6.404019358, -10.585984171), (80, 9.575987701, -13.777945454), (80, 12.767948984, -10.605977112), (80, 9.595980642, -7.414015829), (80, 6.424012299, -4.222054546), (80, 3.232051016, -7.394022888), (80, 6.404019358, -10.585984171)], [0, 0, 0, 0, 0.5, 0.5, 0.5, 1, 1, 1, 1], 3, [1, 0.333333333, 0.333333333, 1, 0.333333333, 0.333333333, 1]),
    ]
    cut_loft1 = Solid(Shell([*[Face.make_surface_from_curves(cut_loft1_from[k], cut_loft1_to[k]) for k in range(1)], Face(Wire(cut_loft1_from)), Face(Wire(cut_loft1_to))]))
    add(cut_loft1, mode=Mode.SUBTRACT)

    # Sketch20 → Cut-Extrude14 (cut)
    with BuildSketch(Plane(origin=(0, 0, -63), x_dir=(-1, 0, 0), z_dir=(0, 0, -1))):
        with BuildLine():
            Line((-38.5, 15.2), (-45.5, 15.2))
            ThreePointArc((-45.5, 15.2), (-48.5, 18.2), (-45.5, 21.2))
            Line((-45.5, 21.2), (-38.5, 21.2))
            ThreePointArc((-38.5, 21.2), (-35.5, 18.2), (-38.5, 15.2))
        make_face()
    extrude(amount=-CUT_EXTRUDE14_DEPTH, mode=Mode.SUBTRACT)

    # Sketch21 → Cut-Extrude15 (cut)
    with BuildSketch(Plane.XZ.offset(-23)):
        with Locations(Location((72, -41.5, 0), (0, 0, 270))):
            Circle(SKETCH21_R)
        with Locations(Location((72, -21.5, 0), (0, 0, 270))):
            Circle(SKETCH21_R)
    extrude(amount=-CUT_EXTRUDE15_DEPTH, mode=Mode.SUBTRACT)


solid = part.part
